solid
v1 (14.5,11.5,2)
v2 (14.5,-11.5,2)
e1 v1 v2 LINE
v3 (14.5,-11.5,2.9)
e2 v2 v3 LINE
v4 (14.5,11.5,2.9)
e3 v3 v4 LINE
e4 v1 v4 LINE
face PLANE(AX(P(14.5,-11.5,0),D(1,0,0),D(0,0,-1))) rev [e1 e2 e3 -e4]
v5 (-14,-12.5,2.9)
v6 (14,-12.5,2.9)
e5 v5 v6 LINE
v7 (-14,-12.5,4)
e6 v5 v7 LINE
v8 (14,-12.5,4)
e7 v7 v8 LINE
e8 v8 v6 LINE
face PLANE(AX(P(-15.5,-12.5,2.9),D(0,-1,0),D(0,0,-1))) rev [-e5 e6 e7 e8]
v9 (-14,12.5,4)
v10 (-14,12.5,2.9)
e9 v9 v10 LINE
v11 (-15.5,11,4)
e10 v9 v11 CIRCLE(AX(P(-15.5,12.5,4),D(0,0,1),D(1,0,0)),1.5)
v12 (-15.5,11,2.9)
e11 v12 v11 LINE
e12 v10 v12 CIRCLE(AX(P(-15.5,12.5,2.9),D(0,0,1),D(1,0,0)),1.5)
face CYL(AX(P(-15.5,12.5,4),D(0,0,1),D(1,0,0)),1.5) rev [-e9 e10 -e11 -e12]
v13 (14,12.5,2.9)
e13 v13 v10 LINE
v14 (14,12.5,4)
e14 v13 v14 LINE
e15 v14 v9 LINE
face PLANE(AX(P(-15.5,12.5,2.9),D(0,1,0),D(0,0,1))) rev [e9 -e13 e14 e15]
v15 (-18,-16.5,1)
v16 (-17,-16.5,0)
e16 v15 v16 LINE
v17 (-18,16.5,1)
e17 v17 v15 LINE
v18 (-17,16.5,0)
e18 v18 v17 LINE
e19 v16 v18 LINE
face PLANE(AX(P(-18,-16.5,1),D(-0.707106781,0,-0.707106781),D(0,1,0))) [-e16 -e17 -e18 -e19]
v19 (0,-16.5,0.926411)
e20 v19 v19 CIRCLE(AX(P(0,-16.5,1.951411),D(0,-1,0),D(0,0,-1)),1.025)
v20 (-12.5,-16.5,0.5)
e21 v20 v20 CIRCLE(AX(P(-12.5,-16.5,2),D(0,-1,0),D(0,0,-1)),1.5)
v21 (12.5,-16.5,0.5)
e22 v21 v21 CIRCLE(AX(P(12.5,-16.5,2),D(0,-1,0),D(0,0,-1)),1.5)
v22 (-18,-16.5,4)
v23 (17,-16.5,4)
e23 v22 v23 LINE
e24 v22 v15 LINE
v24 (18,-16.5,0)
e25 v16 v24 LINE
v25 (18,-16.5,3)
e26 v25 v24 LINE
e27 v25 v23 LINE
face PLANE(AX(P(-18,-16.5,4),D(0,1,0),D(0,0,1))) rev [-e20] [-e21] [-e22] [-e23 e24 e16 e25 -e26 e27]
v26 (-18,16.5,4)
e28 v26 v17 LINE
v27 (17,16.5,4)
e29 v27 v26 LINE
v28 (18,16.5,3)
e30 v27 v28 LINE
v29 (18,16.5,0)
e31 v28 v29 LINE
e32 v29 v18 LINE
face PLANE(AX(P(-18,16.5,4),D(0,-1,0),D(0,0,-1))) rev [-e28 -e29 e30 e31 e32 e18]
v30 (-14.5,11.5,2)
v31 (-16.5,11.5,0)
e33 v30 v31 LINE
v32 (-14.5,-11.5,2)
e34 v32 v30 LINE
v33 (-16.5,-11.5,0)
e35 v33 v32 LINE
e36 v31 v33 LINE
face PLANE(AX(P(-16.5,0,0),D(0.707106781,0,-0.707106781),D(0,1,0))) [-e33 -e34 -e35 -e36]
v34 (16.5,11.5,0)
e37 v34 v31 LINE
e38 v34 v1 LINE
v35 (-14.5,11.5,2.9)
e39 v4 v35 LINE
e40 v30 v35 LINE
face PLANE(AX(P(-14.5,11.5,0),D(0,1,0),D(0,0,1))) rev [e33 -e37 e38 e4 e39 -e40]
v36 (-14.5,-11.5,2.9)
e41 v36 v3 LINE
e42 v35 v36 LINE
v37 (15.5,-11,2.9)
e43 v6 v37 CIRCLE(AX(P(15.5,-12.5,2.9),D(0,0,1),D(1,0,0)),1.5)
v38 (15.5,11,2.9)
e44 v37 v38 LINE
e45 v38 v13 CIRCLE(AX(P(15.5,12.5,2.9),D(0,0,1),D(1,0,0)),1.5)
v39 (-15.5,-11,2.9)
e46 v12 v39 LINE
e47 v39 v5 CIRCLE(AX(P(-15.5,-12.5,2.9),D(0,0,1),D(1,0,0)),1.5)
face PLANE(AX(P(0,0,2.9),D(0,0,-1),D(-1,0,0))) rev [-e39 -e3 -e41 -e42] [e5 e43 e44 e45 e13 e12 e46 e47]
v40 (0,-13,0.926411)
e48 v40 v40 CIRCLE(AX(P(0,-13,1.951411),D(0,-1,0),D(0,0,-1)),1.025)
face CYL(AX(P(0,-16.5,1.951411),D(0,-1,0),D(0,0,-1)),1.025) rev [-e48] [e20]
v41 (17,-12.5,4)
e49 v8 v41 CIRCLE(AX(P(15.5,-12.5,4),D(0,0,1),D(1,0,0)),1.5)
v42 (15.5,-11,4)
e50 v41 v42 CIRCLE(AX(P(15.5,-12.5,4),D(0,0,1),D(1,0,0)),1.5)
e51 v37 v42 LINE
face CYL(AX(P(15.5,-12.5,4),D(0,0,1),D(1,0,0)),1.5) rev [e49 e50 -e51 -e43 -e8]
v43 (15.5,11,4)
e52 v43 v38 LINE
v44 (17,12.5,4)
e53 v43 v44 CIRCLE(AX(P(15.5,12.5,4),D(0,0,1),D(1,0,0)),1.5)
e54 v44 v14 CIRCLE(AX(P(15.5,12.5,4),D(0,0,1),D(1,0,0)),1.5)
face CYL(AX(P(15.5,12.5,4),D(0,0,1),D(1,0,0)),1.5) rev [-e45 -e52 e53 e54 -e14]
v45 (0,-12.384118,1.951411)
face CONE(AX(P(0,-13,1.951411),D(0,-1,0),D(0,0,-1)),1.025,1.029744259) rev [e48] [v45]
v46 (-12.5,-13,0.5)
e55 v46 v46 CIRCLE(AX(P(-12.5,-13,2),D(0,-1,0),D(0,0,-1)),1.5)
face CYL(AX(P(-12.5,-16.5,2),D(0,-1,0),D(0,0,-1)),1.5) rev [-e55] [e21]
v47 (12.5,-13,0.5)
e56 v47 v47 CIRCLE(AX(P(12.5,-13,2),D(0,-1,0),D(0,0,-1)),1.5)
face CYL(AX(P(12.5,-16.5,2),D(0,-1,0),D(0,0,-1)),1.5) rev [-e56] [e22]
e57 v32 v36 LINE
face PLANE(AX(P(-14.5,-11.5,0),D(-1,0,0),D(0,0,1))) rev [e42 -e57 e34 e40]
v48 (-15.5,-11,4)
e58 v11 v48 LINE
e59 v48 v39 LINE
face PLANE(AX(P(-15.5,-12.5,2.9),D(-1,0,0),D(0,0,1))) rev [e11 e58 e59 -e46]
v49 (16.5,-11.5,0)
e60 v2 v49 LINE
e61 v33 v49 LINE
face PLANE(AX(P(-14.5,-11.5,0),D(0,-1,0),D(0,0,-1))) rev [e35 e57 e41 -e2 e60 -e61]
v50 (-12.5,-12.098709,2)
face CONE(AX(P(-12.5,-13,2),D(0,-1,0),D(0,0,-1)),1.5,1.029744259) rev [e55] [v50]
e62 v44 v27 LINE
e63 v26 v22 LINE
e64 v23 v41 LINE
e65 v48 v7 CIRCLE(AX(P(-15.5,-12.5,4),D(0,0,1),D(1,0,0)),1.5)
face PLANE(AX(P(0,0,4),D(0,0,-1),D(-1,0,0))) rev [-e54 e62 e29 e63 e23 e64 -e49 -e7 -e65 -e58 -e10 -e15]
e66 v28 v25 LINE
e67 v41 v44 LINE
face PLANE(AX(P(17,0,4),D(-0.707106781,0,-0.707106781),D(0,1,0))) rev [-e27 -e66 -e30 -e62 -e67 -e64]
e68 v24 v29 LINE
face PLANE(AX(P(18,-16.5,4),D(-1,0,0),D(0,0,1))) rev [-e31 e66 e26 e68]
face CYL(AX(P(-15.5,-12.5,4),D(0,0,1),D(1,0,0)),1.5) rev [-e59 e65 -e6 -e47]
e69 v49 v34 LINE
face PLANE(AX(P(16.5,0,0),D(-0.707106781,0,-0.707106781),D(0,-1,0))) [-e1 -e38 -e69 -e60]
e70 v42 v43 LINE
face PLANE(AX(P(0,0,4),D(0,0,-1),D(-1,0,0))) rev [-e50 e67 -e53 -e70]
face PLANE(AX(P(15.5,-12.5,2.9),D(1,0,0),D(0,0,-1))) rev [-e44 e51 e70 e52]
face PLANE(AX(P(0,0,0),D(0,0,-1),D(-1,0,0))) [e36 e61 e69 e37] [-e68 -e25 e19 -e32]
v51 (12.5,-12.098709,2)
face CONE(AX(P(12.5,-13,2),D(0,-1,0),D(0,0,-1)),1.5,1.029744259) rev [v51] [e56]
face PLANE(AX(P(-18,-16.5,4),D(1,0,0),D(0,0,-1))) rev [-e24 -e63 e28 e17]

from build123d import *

# Parameters (mm, degrees)
SKETCH1_W                 = 36
SKETCH1_H                 = 33
BOSS_EXTRUDE1_DEPTH       = 4
SKETCH2_W                 = 31
SKETCH2_H                 = 25
CUT_EXTRUDE1_DEPTH        = 1.1
F_3_0MM_DOWEL_HOLE1_D     = 3
F_3_0MM_DOWEL_HOLE1_DEPTH = 1.1
SKETCH5_W                 = 29
SKETCH5_H                 = 23
CUT_EXTRUDE2_DEPTH        = 25.589835298
CHAMFER1_SIZE             = 2
CHAMFER2_SIZE             = 1
F_3_0MM_DOWEL_HOLE2_D     = 3
F_3_0MM_DOWEL_HOLE2_DEPTH = 3.5
F_3_0MM_DOWEL_HOLE2_TIP   = 0.901290929


# Read off the part's stored shape, not the designer's step: M2.5x0.45 Tapped Hole1
with BuildPart() as part:
    # Sketch1 → Boss-Extrude1 (new body)
    with BuildSketch(Plane.XY):
        Rectangle(SKETCH1_W, SKETCH1_H)
    extrude(amount=BOSS_EXTRUDE1_DEPTH)

    # Sketch2 → Cut-Extrude1 (cut)
    with BuildSketch(Plane.XY.offset(4)):
        Rectangle(SKETCH2_W, SKETCH2_H)
    extrude(amount=-CUT_EXTRUDE1_DEPTH, mode=Mode.SUBTRACT)

    # Ø3.0mm Dowel Hole1
    with Locations(Plane.XY.offset(4)):
        with Locations((-15.5, 12.5), (15.5, 12.5), (15.5, -12.5), (-15.5, -12.5)):
            Hole(F_3_0MM_DOWEL_HOLE1_D / 2, depth=F_3_0MM_DOWEL_HOLE1_DEPTH)

    # Sketch5 → Cut-Extrude2 (cut, through all)
    with BuildSketch(Plane.XY.offset(2.9)):
        Rectangle(SKETCH5_W, SKETCH5_H)
    extrude(amount=-CUT_EXTRUDE2_DEPTH, mode=Mode.SUBTRACT)

    # Chamfer1
    chamfer1_edges = [part.edges().sort_by_distance(p)[0] for p in [
        (14.5, 0, 0),
        (-14.5, 0, 0),
    ]]
    chamfer(chamfer1_edges, length=CHAMFER1_SIZE)

    # Chamfer2
    chamfer2_edges = [part.edges().sort_by_distance(p)[0] for p in [
        (18, 0, 4),
        (-18, 0, 0),
    ]]
    chamfer(chamfer2_edges, length=CHAMFER2_SIZE - 0.0001)  # a hair under: the kernel refuses the full size

    # Ø3.0mm Dowel Hole2
    with Locations(Plane(origin=(0, -16.5, 0), x_dir=(-1, 0, 0), z_dir=(0, -1, 0))):
        with Locations((12.5, -2), (-12.5, -2)):
            Hole(F_3_0MM_DOWEL_HOLE2_D / 2, depth=F_3_0MM_DOWEL_HOLE2_DEPTH)
            with Locations((0, 0, -(F_3_0MM_DOWEL_HOLE2_DEPTH + F_3_0MM_DOWEL_HOLE2_TIP / 2))):  # 118° drill point
                Cone(0, F_3_0MM_DOWEL_HOLE2_D / 2, F_3_0MM_DOWEL_HOLE2_TIP, mode=Mode.SUBTRACT)

    # M2.5x0.45 Tapped Hole1 outline → M2.5x0.45 Tapped Hole1 (revolve, cut)
    with BuildSketch(Plane.XY.offset(1.951410637)):
        Polygon((1.025, -13), (0, -12.384117865), (0, -16.5), (1.025, -16.5), align=None)
    revolve(axis=Axis((0, 0, 1.951410637), (0, 1, 0)), mode=Mode.SUBTRACT)


solid = part.part
